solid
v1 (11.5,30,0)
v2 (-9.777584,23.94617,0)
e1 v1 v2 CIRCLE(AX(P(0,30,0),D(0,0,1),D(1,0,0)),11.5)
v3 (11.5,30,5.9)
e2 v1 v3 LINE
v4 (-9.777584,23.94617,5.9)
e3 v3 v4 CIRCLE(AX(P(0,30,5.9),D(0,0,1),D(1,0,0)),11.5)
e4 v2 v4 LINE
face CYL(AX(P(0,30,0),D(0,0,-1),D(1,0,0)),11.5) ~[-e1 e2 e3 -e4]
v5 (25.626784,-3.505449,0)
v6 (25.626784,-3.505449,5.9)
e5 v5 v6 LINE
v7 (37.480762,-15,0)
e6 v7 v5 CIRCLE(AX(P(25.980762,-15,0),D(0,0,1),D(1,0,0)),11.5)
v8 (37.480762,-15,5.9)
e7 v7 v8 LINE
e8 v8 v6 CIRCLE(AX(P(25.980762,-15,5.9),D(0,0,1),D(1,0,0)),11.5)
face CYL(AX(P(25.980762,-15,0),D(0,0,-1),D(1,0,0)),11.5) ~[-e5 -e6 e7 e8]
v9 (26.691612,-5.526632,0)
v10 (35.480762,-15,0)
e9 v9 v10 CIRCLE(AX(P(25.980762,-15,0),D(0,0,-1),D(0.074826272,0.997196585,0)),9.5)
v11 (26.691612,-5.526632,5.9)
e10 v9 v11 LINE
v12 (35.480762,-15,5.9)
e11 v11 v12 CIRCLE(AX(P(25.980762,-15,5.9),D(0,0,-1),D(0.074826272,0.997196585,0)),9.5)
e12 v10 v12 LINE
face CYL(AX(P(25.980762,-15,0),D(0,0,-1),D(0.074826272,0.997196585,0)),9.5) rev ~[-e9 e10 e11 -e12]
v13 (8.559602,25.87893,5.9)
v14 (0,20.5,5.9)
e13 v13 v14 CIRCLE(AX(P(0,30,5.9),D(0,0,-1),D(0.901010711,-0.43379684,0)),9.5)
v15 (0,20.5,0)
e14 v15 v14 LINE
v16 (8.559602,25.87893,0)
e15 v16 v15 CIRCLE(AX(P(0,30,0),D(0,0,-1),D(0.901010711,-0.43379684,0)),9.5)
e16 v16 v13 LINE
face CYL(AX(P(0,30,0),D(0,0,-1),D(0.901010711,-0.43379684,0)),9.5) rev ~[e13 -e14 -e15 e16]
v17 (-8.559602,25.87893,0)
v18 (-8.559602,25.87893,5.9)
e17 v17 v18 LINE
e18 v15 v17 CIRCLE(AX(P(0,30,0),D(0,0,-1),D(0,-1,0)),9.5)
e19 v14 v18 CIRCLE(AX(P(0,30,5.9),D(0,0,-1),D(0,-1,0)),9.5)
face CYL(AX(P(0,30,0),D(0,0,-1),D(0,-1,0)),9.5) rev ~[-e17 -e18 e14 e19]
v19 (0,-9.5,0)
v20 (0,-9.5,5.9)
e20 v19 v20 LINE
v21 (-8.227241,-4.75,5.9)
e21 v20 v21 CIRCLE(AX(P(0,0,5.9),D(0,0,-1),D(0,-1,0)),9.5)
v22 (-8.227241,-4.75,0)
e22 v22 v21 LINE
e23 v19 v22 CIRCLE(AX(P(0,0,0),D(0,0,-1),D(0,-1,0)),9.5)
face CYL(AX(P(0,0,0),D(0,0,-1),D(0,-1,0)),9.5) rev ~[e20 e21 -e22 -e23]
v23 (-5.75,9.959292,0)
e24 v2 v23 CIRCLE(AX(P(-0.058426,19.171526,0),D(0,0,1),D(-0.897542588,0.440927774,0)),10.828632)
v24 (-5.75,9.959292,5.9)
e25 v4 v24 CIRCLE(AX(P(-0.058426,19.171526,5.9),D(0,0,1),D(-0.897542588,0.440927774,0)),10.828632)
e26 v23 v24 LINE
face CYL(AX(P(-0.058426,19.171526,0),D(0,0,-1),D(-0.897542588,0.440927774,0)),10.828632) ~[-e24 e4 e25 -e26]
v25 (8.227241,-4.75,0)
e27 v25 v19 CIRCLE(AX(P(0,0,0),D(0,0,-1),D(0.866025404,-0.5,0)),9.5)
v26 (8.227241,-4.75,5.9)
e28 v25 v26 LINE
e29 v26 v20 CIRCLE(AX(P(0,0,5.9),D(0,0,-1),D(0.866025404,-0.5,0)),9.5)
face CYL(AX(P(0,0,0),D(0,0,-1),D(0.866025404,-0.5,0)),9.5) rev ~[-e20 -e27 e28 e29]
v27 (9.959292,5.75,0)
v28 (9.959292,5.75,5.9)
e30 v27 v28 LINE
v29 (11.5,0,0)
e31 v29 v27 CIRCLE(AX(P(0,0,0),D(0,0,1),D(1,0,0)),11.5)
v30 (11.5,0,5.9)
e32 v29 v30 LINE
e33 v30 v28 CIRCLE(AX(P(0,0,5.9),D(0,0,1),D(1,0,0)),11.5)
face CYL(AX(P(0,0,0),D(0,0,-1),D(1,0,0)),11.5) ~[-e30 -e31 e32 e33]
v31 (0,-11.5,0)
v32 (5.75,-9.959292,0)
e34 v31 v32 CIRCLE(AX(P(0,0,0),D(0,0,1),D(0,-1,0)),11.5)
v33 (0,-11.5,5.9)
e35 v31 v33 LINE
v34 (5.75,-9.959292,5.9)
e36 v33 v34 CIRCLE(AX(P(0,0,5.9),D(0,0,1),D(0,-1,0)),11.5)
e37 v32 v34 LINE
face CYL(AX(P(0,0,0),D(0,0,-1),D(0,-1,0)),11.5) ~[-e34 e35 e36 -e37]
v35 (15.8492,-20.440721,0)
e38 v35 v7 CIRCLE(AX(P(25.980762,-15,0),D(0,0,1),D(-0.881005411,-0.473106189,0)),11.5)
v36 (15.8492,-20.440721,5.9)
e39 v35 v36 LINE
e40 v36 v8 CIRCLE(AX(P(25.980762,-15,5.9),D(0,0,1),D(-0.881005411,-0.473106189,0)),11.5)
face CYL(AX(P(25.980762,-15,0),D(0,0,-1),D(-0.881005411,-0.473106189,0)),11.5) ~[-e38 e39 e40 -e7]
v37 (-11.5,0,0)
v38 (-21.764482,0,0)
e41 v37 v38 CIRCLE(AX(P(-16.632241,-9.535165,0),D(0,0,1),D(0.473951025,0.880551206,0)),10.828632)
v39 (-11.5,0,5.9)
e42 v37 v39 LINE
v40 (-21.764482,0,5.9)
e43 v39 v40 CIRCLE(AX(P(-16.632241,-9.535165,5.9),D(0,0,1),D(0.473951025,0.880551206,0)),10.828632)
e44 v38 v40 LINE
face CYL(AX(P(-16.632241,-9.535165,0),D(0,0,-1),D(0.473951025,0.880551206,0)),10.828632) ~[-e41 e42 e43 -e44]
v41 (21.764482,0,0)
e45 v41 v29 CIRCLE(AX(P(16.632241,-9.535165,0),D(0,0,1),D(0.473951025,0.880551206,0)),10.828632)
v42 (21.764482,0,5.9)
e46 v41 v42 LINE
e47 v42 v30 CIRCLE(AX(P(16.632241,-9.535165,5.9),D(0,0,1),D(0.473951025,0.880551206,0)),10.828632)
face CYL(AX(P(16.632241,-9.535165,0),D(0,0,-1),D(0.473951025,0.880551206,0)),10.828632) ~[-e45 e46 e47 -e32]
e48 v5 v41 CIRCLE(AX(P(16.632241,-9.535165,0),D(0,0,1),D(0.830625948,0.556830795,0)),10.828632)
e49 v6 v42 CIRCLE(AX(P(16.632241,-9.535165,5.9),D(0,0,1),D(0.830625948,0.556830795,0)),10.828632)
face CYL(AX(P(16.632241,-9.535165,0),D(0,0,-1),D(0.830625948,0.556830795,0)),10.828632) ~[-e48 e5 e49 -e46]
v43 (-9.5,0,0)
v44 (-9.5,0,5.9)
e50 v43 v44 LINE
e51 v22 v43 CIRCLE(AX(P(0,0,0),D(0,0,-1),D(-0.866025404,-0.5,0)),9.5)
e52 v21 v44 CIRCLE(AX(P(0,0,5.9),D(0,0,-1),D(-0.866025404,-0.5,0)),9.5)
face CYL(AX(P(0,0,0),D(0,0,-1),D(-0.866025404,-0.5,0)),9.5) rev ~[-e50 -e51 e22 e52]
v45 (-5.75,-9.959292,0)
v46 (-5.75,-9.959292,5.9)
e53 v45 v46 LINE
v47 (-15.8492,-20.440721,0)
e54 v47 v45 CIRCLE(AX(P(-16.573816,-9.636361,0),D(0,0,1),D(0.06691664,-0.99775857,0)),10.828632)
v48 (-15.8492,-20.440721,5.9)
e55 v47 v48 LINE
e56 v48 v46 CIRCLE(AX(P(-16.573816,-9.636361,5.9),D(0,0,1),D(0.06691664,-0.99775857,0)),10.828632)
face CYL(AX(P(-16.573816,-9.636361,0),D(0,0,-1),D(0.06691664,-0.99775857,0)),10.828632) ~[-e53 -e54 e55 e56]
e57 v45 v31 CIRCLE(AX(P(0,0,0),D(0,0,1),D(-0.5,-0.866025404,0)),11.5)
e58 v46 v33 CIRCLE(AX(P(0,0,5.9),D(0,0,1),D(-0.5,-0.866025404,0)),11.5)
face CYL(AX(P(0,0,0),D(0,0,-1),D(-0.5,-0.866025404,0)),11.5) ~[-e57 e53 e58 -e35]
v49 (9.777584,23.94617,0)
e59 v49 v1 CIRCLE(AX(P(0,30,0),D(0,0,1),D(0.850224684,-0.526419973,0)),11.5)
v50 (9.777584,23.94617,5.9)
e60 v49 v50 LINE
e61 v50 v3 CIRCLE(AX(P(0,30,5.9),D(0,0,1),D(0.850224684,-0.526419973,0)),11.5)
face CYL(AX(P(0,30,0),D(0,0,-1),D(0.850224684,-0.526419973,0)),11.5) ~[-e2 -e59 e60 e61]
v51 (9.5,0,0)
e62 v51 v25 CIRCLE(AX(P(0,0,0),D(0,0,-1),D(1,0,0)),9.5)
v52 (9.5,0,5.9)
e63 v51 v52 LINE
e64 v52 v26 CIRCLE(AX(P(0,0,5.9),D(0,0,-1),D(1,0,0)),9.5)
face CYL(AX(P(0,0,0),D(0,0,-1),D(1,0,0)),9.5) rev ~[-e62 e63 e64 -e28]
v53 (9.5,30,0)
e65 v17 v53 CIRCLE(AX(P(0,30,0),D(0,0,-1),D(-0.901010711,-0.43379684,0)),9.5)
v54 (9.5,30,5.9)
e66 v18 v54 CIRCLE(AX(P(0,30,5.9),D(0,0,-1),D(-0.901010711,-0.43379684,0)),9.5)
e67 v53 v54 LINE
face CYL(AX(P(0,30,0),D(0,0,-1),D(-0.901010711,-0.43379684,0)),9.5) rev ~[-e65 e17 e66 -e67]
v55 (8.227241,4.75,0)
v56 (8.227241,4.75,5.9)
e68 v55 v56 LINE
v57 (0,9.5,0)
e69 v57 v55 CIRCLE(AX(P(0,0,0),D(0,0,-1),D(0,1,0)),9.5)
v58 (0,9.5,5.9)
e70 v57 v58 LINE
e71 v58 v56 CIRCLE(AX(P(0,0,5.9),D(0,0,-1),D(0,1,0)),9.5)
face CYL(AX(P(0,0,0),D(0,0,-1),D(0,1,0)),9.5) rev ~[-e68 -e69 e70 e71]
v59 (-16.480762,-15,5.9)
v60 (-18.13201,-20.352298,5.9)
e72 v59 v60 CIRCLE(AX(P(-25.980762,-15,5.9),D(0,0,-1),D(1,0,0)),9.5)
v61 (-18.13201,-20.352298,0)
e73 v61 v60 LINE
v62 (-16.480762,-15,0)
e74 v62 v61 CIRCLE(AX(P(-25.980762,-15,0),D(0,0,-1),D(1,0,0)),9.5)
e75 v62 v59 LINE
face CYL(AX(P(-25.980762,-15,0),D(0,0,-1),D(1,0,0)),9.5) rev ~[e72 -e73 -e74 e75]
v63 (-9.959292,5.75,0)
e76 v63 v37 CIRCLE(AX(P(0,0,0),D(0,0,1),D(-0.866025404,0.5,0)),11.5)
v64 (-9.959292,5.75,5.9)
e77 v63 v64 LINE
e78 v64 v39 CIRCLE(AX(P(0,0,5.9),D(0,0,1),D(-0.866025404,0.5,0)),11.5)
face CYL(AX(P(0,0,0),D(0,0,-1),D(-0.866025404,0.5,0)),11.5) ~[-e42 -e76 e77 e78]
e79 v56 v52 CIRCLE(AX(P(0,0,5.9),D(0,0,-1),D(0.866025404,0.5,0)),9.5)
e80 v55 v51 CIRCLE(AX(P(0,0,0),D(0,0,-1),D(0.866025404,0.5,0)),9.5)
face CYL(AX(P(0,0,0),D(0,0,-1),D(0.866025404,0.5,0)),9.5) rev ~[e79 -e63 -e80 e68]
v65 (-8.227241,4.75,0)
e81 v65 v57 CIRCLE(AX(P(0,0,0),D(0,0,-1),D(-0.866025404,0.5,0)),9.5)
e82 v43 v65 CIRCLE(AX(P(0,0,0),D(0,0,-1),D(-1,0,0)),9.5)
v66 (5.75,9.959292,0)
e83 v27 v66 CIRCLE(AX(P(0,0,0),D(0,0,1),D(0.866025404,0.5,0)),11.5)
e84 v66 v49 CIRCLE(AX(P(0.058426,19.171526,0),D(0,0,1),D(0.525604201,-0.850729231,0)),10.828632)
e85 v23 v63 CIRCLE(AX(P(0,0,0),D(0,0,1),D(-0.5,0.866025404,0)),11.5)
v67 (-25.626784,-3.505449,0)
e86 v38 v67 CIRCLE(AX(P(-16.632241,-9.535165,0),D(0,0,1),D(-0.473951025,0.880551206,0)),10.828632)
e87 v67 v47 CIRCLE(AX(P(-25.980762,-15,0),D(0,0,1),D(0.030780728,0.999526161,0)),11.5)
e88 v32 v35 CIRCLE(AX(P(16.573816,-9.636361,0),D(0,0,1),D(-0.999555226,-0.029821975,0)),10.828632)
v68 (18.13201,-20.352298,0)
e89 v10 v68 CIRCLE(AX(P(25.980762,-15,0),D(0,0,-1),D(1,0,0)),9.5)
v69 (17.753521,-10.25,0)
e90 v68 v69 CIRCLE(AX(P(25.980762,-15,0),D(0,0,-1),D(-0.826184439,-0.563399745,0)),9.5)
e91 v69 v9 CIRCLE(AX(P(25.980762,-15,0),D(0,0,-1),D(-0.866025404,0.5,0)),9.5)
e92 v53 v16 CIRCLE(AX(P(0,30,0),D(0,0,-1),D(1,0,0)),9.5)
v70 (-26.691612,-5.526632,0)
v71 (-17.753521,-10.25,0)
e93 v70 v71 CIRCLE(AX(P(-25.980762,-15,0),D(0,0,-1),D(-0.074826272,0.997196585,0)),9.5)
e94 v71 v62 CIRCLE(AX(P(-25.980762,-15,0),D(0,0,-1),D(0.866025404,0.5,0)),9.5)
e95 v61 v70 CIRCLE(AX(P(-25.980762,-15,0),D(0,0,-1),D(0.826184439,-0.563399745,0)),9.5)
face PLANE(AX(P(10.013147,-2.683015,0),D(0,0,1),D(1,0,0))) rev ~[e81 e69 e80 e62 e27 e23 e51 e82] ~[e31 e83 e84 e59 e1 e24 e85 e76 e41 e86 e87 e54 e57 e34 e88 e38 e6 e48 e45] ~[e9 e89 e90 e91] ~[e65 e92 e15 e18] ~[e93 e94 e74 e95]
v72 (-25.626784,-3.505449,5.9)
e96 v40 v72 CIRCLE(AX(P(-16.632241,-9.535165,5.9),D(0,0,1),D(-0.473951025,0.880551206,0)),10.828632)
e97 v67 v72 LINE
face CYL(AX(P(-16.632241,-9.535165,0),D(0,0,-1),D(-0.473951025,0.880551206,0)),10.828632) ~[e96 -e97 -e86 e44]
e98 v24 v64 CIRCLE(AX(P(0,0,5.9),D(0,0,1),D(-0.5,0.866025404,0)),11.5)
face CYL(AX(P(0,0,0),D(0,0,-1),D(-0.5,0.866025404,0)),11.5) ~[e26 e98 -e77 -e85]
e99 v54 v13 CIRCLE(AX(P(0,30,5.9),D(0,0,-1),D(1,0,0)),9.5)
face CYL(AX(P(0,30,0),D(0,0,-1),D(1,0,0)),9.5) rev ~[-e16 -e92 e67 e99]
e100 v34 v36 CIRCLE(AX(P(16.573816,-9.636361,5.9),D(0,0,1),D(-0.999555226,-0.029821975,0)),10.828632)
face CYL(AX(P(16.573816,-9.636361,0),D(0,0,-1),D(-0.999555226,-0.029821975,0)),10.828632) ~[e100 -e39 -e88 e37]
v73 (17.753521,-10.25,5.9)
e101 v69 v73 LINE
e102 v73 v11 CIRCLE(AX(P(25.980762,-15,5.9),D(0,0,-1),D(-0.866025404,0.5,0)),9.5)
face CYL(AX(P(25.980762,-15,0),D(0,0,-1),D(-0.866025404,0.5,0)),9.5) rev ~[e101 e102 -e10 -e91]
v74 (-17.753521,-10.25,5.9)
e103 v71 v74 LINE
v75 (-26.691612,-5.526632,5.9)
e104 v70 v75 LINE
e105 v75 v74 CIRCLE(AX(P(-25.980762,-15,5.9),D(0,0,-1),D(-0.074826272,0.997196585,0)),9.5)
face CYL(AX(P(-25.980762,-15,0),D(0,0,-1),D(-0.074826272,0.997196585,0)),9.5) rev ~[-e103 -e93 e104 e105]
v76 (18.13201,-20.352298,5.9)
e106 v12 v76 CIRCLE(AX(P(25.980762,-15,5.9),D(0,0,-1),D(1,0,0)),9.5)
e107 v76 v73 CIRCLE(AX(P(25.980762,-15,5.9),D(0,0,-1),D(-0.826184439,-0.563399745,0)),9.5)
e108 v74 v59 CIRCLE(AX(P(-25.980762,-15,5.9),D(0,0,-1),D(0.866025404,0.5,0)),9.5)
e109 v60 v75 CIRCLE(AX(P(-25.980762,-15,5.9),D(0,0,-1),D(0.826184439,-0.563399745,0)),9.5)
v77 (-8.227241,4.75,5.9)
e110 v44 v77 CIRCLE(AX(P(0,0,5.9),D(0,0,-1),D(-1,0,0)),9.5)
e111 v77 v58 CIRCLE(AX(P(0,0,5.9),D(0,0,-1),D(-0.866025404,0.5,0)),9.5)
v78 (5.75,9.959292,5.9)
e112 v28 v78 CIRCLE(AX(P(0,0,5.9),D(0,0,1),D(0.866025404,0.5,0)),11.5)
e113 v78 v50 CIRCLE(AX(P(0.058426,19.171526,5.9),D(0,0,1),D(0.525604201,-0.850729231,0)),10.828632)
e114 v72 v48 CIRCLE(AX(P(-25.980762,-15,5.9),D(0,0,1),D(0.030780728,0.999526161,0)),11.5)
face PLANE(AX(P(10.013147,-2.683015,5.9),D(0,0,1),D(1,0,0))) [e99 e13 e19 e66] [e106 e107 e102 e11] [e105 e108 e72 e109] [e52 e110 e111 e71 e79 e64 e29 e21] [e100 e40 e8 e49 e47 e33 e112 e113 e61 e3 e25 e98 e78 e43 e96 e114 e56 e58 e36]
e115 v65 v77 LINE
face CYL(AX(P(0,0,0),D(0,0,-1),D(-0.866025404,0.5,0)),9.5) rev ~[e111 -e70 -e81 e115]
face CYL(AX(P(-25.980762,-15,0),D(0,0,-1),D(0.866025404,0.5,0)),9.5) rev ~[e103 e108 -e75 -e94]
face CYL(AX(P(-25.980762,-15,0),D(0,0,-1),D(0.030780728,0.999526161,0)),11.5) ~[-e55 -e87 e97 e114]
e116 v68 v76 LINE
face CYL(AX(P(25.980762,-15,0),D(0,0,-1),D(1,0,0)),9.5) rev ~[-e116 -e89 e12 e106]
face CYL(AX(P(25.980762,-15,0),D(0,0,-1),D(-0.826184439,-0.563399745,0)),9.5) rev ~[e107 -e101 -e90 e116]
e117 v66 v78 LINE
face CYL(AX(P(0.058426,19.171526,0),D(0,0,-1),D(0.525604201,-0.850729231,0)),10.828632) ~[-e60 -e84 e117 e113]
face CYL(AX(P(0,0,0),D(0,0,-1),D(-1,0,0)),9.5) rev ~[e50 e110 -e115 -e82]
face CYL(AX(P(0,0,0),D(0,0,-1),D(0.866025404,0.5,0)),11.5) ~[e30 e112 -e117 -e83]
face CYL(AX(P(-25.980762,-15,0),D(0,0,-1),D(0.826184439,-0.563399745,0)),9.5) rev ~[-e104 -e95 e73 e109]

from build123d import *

# Parameters (mm, degrees)
F1_DEPTH = 5.9


with BuildPart() as f1:
    # F0 (on Top) → F1 (new body)
    with BuildSketch(Plane.XY):
        with BuildLine():
            Line((11.5, 0), (9.5, 0))
            ThreePointArc((9.5, 0), (9.1762953497, -2.4587809285), (8.227241336, -4.75))
            Line((8.227241336, -4.75), (9.9592921435, -5.75))
            ThreePointArc((9.9592921435, -5.75), (11.1081470023, -2.9764190187), (11.5, 0))
        make_face()
        with BuildLine():
            ThreePointArc((8.227241336, 4.75), (9.1762953497, 2.4587809285), (9.5, 0))
            Line((9.5, 0), (11.5, 0))
            ThreePointArc((11.5, 0), (11.1081470023, 2.9764190187), (9.9592921435, 5.75))
            Line((9.9592921435, 5.75), (8.227241336, 4.75))
        make_face()
        with BuildLine():
            ThreePointArc((0, 9.5), (4.75, 8.227241336), (8.227241336, 4.75))
            Line((8.227241336, 4.75), (9.9592921435, 5.75))
            ThreePointArc((9.9592921435, 5.75), (8.1317279836, 8.1317279836), (5.75, 9.9592921435))
            ThreePointArc((5.75, 9.9592921435), (2.9764190187, 11.1081470023), (0, 11.5))
            Line((0, 11.5), (0, 9.5))
        make_face()
        with BuildLine():
            Line((9.9592921435, -5.75), (8.227241336, -4.75))
            ThreePointArc((8.227241336, -4.75), (4.75, -8.227241336), (0, -9.5))
            Line((0, -9.5), (0, -11.5))
            ThreePointArc((0, -11.5), (2.9764190187, -11.1081470023), (5.75, -9.9592921435))
            ThreePointArc((5.75, -9.9592921435), (8.1317279836, -8.1317279836), (9.9592921435, -5.75))
        make_face()
        with BuildLine():
            Line((21.7644823154, 0), (11.5, 0))
            ThreePointArc((11.5, 0), (11.1081470023, -2.9764190187), (9.9592921435, -5.75))
            Line((9.9592921435, -5.75), (16.02146997, -9.25))
            ThreePointArc((16.02146997, -9.25), (20.0781480078, -5.1303927779), (25.6267837466, -3.5054491468))
            ThreePointArc((25.6267837466, -3.5054491468), (23.9098470955, -1.5167036662), (21.7644823154, 0))
        make_face()
        with BuildLine():
            ThreePointArc((21.7644823154, 0), (16.6322411577, 1.2934670156), (11.5, 0))
            Line((11.5, 0), (21.7644823154, 0))
        make_face()
        with BuildLine():
            ThreePointArc((-8.227241336, 4.75), (-4.75, 8.227241336), (0, 9.5))
            Line((0, 9.5), (0, 11.5))
            ThreePointArc((0, 11.5), (-2.9764190187, 11.1081470023), (-5.75, 9.9592921435))
            ThreePointArc((-5.75, 9.9592921435), (-8.1317279836, 8.1317279836), (-9.9592921435, 5.75))
            Line((-9.9592921435, 5.75), (-8.227241336, 4.75))
        make_face()
        with BuildLine():
            Line((0, -11.5), (0, -9.5))
            ThreePointArc((0, -9.5), (-4.75, -8.227241336), (-8.227241336, -4.75))
            Line((-8.227241336, -4.75), (-9.9592921435, -5.75))
            ThreePointArc((-9.9592921435, -5.75), (-8.1317279836, -8.1317279836), (-5.75, -9.9592921435))
            ThreePointArc((-5.75, -9.9592921435), (-2.9764190187, -11.1081470023), (0, -11.5))
        make_face()
        with BuildLine():
            Line((16.02146997, -9.25), (9.9592921435, -5.75))
            ThreePointArc((9.9592921435, -5.75), (8.1317279836, -8.1317279836), (5.75, -9.9592921435))
            ThreePointArc((5.75, -9.9592921435), (8.7759533757, -17.1498563505), (15.8491998862, -20.4407211685))
            ThreePointArc((15.8491998862, -20.4407211685), (14.4821244809, -14.8229898467), (16.02146997, -9.25))
        make_face()
        with BuildLine():
            Line((-9.9592921435, -5.75), (-8.227241336, -4.75))
            ThreePointArc((-8.227241336, -4.75), (-9.1762953497, -2.4587809285), (-9.5, 0))
            Line((-9.5, 0), (-11.5, 0))
            ThreePointArc((-11.5, 0), (-11.1081470023, -2.9764190187), (-9.9592921435, -5.75))
        make_face()
        with BuildLine():
            Line((-11.5, 0), (-9.5, 0))
            ThreePointArc((-9.5, 0), (-9.1762953497, 2.4587809285), (-8.227241336, 4.75))
            Line((-8.227241336, 4.75), (-9.9592921435, 5.75))
            ThreePointArc((-9.9592921435, 5.75), (-11.1081470023, 2.9764190187), (-11.5, 0))
        make_face()
        with BuildLine():
            Line((0, 18.5), (0, 11.5))
            ThreePointArc((0, 11.5), (2.9764190187, 11.1081470023), (5.75, 9.9592921435))
            ThreePointArc((5.75, 9.9592921435), (10.464234583, 16.1751267411), (9.7775838605, 23.9461703153))
            ThreePointArc((9.7775838605, 23.9461703153), (5.5960235268, 19.9533826246), (0, 18.5))
        make_face()
        with BuildLine():
            ThreePointArc((-5.75, 9.9592921435), (-2.9764190187, 11.1081470023), (0, 11.5))
            Line((0, 11.5), (0, 18.5))
            ThreePointArc((0, 18.5), (-5.5960235268, 19.9533826246), (-9.7775838605, 23.9461703153))
            ThreePointArc((-9.7775838605, 23.9461703153), (-10.464234583, 16.1751267411), (-5.75, 9.9592921435))
        make_face()
        with BuildLine():
            ThreePointArc((25.6267837466, -3.5054491468), (20.0781480078, -5.1303927779), (16.02146997, -9.25))
            Line((16.02146997, -9.25), (17.7535207776, -10.25))
            ThreePointArc((17.7535207776, -10.25), (21.5421151907, -6.6006897013), (26.6916116991, -5.5266324432))
            ThreePointArc((26.6916116991, -5.5266324432), (26.212648084, -4.4878813308), (25.6267837466, -3.5054491468))
        make_face()
        with BuildLine():
            Line((17.7535207776, -10.25), (16.02146997, -9.25))
            ThreePointArc((16.02146997, -9.25), (14.4821244809, -14.8229898467), (15.8491998862, -20.4407211685))
            ThreePointArc((15.8491998862, -20.4407211685), (16.9929432837, -20.4568784758), (18.1320099427, -20.3522975778))
            ThreePointArc((18.1320099427, -20.3522975778), (16.4874225591, -15.3556741558), (17.7535207776, -10.25))
        make_face()
        with BuildLine():
            Line((-16.02146997, -9.25), (-9.9592921435, -5.75))
            ThreePointArc((-9.9592921435, -5.75), (-11.1081470023, -2.9764190187), (-11.5, 0))
            Line((-11.5, 0), (-21.7644823154, 0))
            ThreePointArc((-21.7644823154, 0), (-23.9098470955, -1.5167036662), (-25.6267837466, -3.5054491468))
            ThreePointArc((-25.6267837466, -3.5054491468), (-20.0781480078, -5.1303927779), (-16.02146997, -9.25))
        make_face()
        with BuildLine():
            ThreePointArc((-5.75, -9.9592921435), (-8.1317279836, -8.1317279836), (-9.9592921435, -5.75))
            Line((-9.9592921435, -5.75), (-16.02146997, -9.25))
            ThreePointArc((-16.02146997, -9.25), (-14.8726151112, -12.0235809813), (-14.4807621135, -15))
            ThreePointArc((-14.4807621135, -15), (-14.8281174582, -17.8050877335), (-15.8491998862, -20.4407211685))
            ThreePointArc((-15.8491998862, -20.4407211685), (-8.7759533757, -17.1498563505), (-5.75, -9.9592921435))
        make_face()
        with BuildLine():
            Line((-21.7644823154, 0), (-11.5, 0))
            ThreePointArc((-11.5, 0), (-16.6322411577, 1.2934670156), (-21.7644823154, 0))
        make_face()
        with BuildLine():
            ThreePointArc((37.4807621135, -15), (33.9863616782, -6.7440702759), (25.6267837466, -3.5054491468))
            ThreePointArc((25.6267837466, -3.5054491468), (26.212648084, -4.4878813308), (26.6916116991, -5.5266324432))
            ThreePointArc((26.6916116991, -5.5266324432), (32.945066496, -8.5386948324), (35.4807621135, -15))
            ThreePointArc((35.4807621135, -15), (28.7813740446, -24.077806608), (18.1320099427, -20.3522975778))
            ThreePointArc((18.1320099427, -20.3522975778), (16.9929432837, -20.4568784758), (15.8491998862, -20.4407211685))
            ThreePointArc((15.8491998862, -20.4407211685), (28.785849847, -26.1526446553), (37.4807621135, -15))
        make_face()
        with BuildLine():
            ThreePointArc((-9.7775838605, 23.9461703153), (-5.5960235268, 19.9533826246), (0, 18.5))
            Line((0, 18.5), (0, 20.5))
            ThreePointArc((0, 20.5), (-5.0546926316, 21.956363857), (-8.5596017564, 25.8789300209))
            ThreePointArc((-8.5596017564, 25.8789300209), (-9.2197048003, 24.9447598066), (-9.7775838605, 23.9461703153))
        make_face()
        with BuildLine():
            Line((0, 20.5), (0, 18.5))
            ThreePointArc((0, 18.5), (5.5960235268, 19.9533826246), (9.7775838605, 23.9461703153))
            ThreePointArc((9.7775838605, 23.9461703153), (9.2197048003, 24.9447598066), (8.5596017564, 25.8789300209))
            ThreePointArc((8.5596017564, 25.8789300209), (5.0546926316, 21.956363857), (0, 20.5))
        make_face()
        with BuildLine():
            ThreePointArc((8.5596017564, 25.8789300209), (9.2197048003, 24.9447598066), (9.7775838605, 23.9461703153))
            ThreePointArc((9.7775838605, 23.9461703153), (11.0610174576, 26.8529549094), (11.5, 30))
            ThreePointArc((11.5, 30), (-3.1470450906, 41.0610174576), (-9.7775838605, 23.9461703153))
            ThreePointArc((-9.7775838605, 23.9461703153), (-9.2197048003, 24.9447598066), (-8.5596017564, 25.8789300209))
            ThreePointArc((-8.5596017564, 25.8789300209), (-2.1135022255, 39.2619170987), (9.5, 30))
            ThreePointArc((9.5, 30), (9.2619170987, 27.8864977745), (8.5596017564, 25.8789300209))
        make_face()
        with BuildLine():
            ThreePointArc((-14.4807621135, -15), (-14.8726151112, -12.0235809813), (-16.02146997, -9.25))
            Line((-16.02146997, -9.25), (-17.7535207776, -10.25))
            ThreePointArc((-17.7535207776, -10.25), (-16.8044667638, -12.5412190715), (-16.4807621135, -15))
            ThreePointArc((-16.4807621135, -15), (-16.9029555056, -17.8006119311), (-18.1320099427, -20.3522975778))
            ThreePointArc((-18.1320099427, -20.3522975778), (-16.9929432837, -20.4568784758), (-15.8491998862, -20.4407211685))
            ThreePointArc((-15.8491998862, -20.4407211685), (-14.8281174582, -17.8050877335), (-14.4807621135, -15))
        make_face()
        with BuildLine():
            Line((-17.7535207776, -10.25), (-16.02146997, -9.25))
            ThreePointArc((-16.02146997, -9.25), (-20.0781480078, -5.1303927779), (-25.6267837466, -3.5054491468))
            ThreePointArc((-25.6267837466, -3.5054491468), (-26.212648084, -4.4878813308), (-26.6916116991, -5.5266324432))
            ThreePointArc((-26.6916116991, -5.5266324432), (-21.5421151907, -6.6006897013), (-17.7535207776, -10.25))
        make_face()
        with BuildLine():
            ThreePointArc((-25.6267837466, -3.5054491468), (-35.9400542571, -20.75), (-15.8491998862, -20.4407211685))
            ThreePointArc((-15.8491998862, -20.4407211685), (-16.9929432837, -20.4568784758), (-18.1320099427, -20.3522975778))
            ThreePointArc((-18.1320099427, -20.3522975778), (-34.2080034495, -19.75), (-26.6916116991, -5.5266324432))
            ThreePointArc((-26.6916116991, -5.5266324432), (-26.212648084, -4.4878813308), (-25.6267837466, -3.5054491468))
        make_face()
    extrude(amount=F1_DEPTH)


solid = f1.part
